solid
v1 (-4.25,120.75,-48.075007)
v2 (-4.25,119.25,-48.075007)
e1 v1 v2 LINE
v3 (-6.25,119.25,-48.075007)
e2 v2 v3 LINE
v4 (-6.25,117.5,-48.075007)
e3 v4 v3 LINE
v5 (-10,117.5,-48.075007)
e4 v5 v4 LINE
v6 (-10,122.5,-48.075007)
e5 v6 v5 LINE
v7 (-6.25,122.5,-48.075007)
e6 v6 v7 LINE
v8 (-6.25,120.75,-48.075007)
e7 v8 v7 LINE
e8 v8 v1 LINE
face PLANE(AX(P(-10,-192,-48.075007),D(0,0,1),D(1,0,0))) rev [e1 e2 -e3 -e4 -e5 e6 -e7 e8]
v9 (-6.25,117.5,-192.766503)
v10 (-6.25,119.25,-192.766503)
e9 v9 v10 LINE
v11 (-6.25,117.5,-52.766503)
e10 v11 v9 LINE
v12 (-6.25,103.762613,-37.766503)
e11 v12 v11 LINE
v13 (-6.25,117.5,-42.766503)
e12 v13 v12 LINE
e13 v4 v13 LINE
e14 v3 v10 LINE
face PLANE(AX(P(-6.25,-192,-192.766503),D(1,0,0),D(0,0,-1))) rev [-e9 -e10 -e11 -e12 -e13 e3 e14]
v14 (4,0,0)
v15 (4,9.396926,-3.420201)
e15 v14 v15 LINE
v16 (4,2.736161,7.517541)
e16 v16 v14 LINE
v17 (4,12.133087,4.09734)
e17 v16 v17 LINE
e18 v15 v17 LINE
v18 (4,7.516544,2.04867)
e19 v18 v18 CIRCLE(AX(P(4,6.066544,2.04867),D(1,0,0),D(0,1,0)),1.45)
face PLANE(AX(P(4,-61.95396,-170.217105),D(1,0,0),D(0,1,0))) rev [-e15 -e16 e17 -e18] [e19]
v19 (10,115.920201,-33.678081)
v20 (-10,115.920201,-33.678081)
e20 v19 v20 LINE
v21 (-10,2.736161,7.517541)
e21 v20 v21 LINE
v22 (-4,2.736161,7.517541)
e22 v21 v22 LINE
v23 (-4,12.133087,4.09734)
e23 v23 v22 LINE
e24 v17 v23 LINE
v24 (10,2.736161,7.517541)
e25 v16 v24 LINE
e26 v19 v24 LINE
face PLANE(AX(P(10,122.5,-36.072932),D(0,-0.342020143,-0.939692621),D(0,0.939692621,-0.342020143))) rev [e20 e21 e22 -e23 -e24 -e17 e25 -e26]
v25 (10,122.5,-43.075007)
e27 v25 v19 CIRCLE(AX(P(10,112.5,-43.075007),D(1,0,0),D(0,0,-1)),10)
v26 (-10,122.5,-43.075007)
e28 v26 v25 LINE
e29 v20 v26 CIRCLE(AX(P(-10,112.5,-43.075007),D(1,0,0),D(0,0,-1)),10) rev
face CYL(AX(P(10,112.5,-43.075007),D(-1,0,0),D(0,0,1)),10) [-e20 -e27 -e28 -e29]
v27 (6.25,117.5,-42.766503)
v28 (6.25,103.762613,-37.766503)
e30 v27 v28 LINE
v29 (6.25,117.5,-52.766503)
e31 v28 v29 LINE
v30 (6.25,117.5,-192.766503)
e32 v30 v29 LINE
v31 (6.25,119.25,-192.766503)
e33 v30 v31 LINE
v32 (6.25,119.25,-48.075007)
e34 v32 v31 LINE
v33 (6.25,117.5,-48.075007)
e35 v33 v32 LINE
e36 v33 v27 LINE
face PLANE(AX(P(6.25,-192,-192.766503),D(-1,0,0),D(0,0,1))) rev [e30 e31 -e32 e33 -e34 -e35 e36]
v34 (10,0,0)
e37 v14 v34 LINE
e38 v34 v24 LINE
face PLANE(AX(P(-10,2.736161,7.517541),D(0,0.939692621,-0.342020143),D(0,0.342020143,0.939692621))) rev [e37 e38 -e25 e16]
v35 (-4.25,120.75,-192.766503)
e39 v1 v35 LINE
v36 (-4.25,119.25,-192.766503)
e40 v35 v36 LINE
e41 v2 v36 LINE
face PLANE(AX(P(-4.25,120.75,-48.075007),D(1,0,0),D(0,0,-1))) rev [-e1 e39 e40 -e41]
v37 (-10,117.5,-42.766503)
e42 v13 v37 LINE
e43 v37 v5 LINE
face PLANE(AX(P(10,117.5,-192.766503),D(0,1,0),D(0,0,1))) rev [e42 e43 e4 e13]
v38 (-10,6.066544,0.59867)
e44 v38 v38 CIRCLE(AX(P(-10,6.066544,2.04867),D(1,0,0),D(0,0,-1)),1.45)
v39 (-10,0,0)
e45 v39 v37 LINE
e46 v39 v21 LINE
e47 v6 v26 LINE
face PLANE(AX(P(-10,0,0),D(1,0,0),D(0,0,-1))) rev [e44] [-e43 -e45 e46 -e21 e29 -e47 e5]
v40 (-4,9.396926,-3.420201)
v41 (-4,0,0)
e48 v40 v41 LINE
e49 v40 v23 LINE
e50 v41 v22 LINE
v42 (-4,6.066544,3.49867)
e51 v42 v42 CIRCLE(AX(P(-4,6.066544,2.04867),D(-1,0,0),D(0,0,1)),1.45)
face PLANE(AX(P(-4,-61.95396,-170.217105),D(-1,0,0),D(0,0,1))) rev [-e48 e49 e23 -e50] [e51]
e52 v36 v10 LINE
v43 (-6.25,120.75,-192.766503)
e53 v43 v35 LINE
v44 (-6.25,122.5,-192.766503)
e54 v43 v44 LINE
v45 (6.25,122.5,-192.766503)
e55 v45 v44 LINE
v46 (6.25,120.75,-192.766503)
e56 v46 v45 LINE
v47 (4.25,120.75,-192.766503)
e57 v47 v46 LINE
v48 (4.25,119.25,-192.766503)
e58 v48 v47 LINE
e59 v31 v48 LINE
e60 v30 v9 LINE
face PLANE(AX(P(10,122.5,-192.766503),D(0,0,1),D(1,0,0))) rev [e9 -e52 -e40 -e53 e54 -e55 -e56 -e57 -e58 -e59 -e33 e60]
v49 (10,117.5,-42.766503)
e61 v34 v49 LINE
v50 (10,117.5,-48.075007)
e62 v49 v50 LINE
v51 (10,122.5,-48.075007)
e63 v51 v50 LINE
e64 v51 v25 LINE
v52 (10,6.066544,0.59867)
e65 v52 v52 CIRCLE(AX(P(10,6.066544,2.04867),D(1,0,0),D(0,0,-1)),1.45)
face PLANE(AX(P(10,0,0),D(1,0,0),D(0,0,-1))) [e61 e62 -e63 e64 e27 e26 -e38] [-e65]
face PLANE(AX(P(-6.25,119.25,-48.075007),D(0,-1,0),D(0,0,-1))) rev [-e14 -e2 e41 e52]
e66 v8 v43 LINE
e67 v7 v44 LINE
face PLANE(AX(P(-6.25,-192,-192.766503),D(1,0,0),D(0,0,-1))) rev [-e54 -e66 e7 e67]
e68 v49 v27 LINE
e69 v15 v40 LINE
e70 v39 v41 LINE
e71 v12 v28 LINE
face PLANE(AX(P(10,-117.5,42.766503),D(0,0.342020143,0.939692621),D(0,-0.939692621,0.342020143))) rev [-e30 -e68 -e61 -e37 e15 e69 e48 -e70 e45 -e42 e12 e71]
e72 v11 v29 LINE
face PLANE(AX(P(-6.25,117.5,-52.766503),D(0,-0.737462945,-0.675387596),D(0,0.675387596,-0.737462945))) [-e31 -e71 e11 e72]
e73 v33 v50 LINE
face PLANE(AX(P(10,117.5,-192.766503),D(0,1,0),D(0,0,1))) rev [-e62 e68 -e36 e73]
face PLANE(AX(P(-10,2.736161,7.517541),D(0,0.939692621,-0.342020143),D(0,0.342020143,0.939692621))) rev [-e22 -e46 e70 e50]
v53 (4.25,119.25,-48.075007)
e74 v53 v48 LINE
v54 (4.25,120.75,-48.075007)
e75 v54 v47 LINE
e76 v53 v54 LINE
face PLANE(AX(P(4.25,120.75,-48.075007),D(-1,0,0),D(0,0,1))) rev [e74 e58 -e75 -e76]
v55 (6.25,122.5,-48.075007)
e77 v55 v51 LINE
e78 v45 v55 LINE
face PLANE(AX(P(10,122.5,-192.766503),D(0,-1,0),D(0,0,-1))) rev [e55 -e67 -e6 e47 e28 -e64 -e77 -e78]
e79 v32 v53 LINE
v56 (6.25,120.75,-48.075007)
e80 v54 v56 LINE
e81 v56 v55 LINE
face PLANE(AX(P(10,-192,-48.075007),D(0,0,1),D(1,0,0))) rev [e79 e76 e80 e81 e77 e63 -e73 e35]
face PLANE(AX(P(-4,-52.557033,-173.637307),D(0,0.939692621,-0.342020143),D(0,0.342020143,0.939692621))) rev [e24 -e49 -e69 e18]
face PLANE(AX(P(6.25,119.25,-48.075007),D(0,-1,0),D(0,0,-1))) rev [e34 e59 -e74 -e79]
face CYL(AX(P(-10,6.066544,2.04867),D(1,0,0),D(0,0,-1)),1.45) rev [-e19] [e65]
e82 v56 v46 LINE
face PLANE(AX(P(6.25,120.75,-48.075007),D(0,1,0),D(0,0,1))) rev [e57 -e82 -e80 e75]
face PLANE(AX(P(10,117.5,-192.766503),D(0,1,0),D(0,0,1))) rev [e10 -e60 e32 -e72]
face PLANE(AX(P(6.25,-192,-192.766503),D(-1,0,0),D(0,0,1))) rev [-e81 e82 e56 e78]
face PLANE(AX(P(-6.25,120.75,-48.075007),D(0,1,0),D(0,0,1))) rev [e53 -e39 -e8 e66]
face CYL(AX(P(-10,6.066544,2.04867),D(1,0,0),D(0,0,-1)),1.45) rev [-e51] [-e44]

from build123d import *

# Parameters (mm, degrees)
BOSS_EXTRUDE1_DEPTH = 10
CHAMFER1_SIZE       = 7.802060087
CHAMFER1_SIZE_2     = 10
BOSS_EXTRUDE2_DEPTH = 20
SKETCH7_R           = 1.5
CUT_EXTRUDE1_DEPTH  = 20
CUT_EXTRUDE3_DEPTH  = 20
FILLET5_R           = 20
FILLET6_R           = 10
SKETCH10_W          = 5.3
SKETCH10_H          = 4.24
CUT_EXTRUDE4_DEPTH  = 273.805653344
SKETCH11_W          = 3.75
SKETCH11_H          = 144.691495626
CUT_EXTRUDE5_DEPTH  = 370.011076387
BOSS_EXTRUDE4_DEPTH = 12.5
SKETCH12_W          = 2
SKETCH12_H          = 1.5
CUT_EXTRUDE6_DEPTH  = 144.691496
CUT_EXTRUDE7_DEPTH  = 273.805653344
SKETCH15_W          = 8
SKETCH15_H          = 10
CUT_EXTRUDE8_DEPTH  = 234.574560204
SKETCH16_R          = 1.45
CUT_EXTRUDE9_DEPTH  = 230.270963046


with BuildPart() as part:
    # Sketch2 → Boss-Extrude1 (new, symmetric)
    with BuildSketch(Plane(origin=(0, 0, 0), x_dir=(0, 0, -1), z_dir=(1, 0, 0))):
        Polygon((36.072931518, 122.5), (-51.279924706, -117.5), (-51.279924706, -192), (-46.279924706, -192), (-46.279924706, -151.5), (-39.679924706, -151.5), (-39.679924706, -192), (-35.679924706, -192), (-35.679924706, -117.5), (-42.766502526, -117.5), (42.766502526, 117.5), (192.766502526, 117.5), (192.766502526, 122.5), align=None)
    extrude(amount=BOSS_EXTRUDE1_DEPTH, both=True)

    # Chamfer1
    # the kernel refuses this chamfer: 10, 7.802060087 mm, written as the material it adds along each edge
    with BuildSketch(Plane(origin=(-10, -117.5, 42.766502526), x_dir=(0, 0.9542611885293297, -0.298974219735734), z_dir=(1, 0, 0))) as chamfer1_piece_1_section:
        Polygon((CHAMFER1_SIZE * 0.998967402661, -CHAMFER1_SIZE * 0.0454326803806), (CHAMFER1_SIZE_2 * 0.298974219736, -CHAMFER1_SIZE_2 * 0.954261188529), (0, 0), align=None)
    chamfer1_piece_1 = extrude(amount=20, mode=Mode.PRIVATE)
    chamfer1_piece_1 = split(chamfer1_piece_1, bisect_by=Plane(origin=(0, -114.855220314, 35.679924706), z_dir=(0, 0, 1)), keep=Keep.TOP, mode=Mode.PRIVATE)
    add(chamfer1_piece_1)

    # Sketch6 → Boss-Extrude2 (add)
    with BuildSketch(Plane(origin=(10, 0, 0), x_dir=(0, 0, -1), z_dir=(1, 0, 0))):
        Polygon((-51.279924706, -180), (-66.279924706, -192), (-51.279924706, -192), align=None)
        Polygon((-35.679924706, -192), (-20.679924706, -192), (-35.679924706, -180), align=None)
    extrude(amount=-BOSS_EXTRUDE2_DEPTH)

    # Sketch7 → Cut-Extrude1 (cut)
    with BuildSketch(Plane(origin=(0, -192, 0), x_dir=(-1, 0, 0), z_dir=(0, -1, 0))):
        with Locations(Location((0, -56.279924706, 0), (0, 0, 90))):
            Circle(SKETCH7_R)
        with Locations(Location((0, -30.179924706, 0), (0, 0, 90))):
            Circle(SKETCH7_R)
    extrude(amount=-CUT_EXTRUDE1_DEPTH, mode=Mode.SUBTRACT)

    # Sketch9 → Cut-Extrude3 (cut)
    with BuildSketch(Plane(origin=(0, -187, 0), x_dir=(-1, 0, 0), z_dir=(0, -1, 0))):
        Polygon((2.75, -57.867637946), (2.75, -54.692211466), (0, -53.104498226), (-2.75, -54.692211466), (-2.75, -57.867637946), (0, -59.455351187), align=None)
        Polygon((2.75, -31.767637946), (2.75, -28.592211466), (0, -27.004498226), (-2.75, -28.592211466), (-2.75, -31.767637946), (0, -33.355351187), align=None)
    extrude(amount=-CUT_EXTRUDE3_DEPTH, mode=Mode.SUBTRACT)

    # Fillet5
    fillet5_edges = [part.edges().sort_by_distance(p)[0] for p in [
        (0, -117.5, 51.279924706),
    ]]
    fillet(fillet5_edges, radius=FILLET5_R)

    # Fillet6
    fillet6_edges = [part.edges().sort_by_distance(p)[0] for p in [
        (0, 122.5, -36.072931518),
    ]]
    fillet(fillet6_edges, radius=FILLET6_R)

    # Sketch10 → Cut-Extrude4 (cut, through all)
    with BuildSketch(Plane(origin=(10, 0, 0), x_dir=(0, 0, -1), z_dir=(1, 0, 0))):
        with Locations((-63.629924706, -189.88)):
            Rectangle(SKETCH10_W, SKETCH10_H)
        with Locations((-23.329924706, -189.88)):
            Rectangle(SKETCH10_W, SKETCH10_H)
    extrude(amount=-CUT_EXTRUDE4_DEPTH, mode=Mode.SUBTRACT)

    # Sketch11 → Cut-Extrude5 (cut, through all)
    with BuildSketch(Plane(origin=(0, 122.5, 0), x_dir=(1, 0, 0), z_dir=(0, 1, 0))):
        with Locations((-8.125, 120.420754713)):
            Rectangle(SKETCH11_W, SKETCH11_H)
        with Locations((8.125, 120.420754713)):
            Rectangle(SKETCH11_W, SKETCH11_H)
    extrude(amount=-CUT_EXTRUDE5_DEPTH, mode=Mode.SUBTRACT)

    # Sketch13 → Boss-Extrude4 (add)
    with BuildSketch(Plane(origin=(6.25, 0, 0), x_dir=(0, 0, -1), z_dir=(1, 0, 0))):
        Polygon((52.766502526, 117.5), (37.766502526, 103.762612903), (42.766502526, 117.5), align=None)
    extrude(amount=-BOSS_EXTRUDE4_DEPTH)

    # Sketch12 → Cut-Extrude6 (cut)
    with BuildSketch(Plane(origin=(0, 0, -192.766502526), x_dir=(-1, 0, 0), z_dir=(0, 0, -1))):
        with Locations((-5.25, 120)):
            Rectangle(SKETCH12_W, SKETCH12_H)
        with Locations((5.25, 120)):
            Rectangle(SKETCH12_W, SKETCH12_H)
    extrude(amount=-CUT_EXTRUDE6_DEPTH, mode=Mode.SUBTRACT)

    # Sketch14 → Cut-Extrude7 (cut, through all)
    with BuildSketch(Plane(origin=(10, 0, 0), x_dir=(0, 0, -1), z_dir=(1, 0, 0))):
        Polygon((-7.517540966, 2.736161147), (0, 0), (0, -210.65241273), (-80.454600392, -210.65241273), (-80.454600392, -132.997640023), align=None)
    extrude(amount=-CUT_EXTRUDE7_DEPTH, mode=Mode.SUBTRACT)

    # Sketch15 → Cut-Extrude8 (cut, through all)
    with BuildSketch(Plane(origin=(0, 2.736161147, 7.517540966), x_dir=(1, 0, 0), z_dir=(0, 0.3420201433256657, 0.9396926207859096))):
        with Locations((0, 5)):
            Rectangle(SKETCH15_W, SKETCH15_H)
    extrude(amount=-CUT_EXTRUDE8_DEPTH, mode=Mode.SUBTRACT)

    # Sketch16 → Cut-Extrude9 (cut, through all)
    with BuildSketch(Plane(origin=(10, 0, 0), x_dir=(0, 0, -1), z_dir=(1, 0, 0))):
        with Locations((-2.048669767, 6.066543677)):
            Circle(SKETCH16_R)
    extrude(amount=-CUT_EXTRUDE9_DEPTH, mode=Mode.SUBTRACT)


solid = part.part
